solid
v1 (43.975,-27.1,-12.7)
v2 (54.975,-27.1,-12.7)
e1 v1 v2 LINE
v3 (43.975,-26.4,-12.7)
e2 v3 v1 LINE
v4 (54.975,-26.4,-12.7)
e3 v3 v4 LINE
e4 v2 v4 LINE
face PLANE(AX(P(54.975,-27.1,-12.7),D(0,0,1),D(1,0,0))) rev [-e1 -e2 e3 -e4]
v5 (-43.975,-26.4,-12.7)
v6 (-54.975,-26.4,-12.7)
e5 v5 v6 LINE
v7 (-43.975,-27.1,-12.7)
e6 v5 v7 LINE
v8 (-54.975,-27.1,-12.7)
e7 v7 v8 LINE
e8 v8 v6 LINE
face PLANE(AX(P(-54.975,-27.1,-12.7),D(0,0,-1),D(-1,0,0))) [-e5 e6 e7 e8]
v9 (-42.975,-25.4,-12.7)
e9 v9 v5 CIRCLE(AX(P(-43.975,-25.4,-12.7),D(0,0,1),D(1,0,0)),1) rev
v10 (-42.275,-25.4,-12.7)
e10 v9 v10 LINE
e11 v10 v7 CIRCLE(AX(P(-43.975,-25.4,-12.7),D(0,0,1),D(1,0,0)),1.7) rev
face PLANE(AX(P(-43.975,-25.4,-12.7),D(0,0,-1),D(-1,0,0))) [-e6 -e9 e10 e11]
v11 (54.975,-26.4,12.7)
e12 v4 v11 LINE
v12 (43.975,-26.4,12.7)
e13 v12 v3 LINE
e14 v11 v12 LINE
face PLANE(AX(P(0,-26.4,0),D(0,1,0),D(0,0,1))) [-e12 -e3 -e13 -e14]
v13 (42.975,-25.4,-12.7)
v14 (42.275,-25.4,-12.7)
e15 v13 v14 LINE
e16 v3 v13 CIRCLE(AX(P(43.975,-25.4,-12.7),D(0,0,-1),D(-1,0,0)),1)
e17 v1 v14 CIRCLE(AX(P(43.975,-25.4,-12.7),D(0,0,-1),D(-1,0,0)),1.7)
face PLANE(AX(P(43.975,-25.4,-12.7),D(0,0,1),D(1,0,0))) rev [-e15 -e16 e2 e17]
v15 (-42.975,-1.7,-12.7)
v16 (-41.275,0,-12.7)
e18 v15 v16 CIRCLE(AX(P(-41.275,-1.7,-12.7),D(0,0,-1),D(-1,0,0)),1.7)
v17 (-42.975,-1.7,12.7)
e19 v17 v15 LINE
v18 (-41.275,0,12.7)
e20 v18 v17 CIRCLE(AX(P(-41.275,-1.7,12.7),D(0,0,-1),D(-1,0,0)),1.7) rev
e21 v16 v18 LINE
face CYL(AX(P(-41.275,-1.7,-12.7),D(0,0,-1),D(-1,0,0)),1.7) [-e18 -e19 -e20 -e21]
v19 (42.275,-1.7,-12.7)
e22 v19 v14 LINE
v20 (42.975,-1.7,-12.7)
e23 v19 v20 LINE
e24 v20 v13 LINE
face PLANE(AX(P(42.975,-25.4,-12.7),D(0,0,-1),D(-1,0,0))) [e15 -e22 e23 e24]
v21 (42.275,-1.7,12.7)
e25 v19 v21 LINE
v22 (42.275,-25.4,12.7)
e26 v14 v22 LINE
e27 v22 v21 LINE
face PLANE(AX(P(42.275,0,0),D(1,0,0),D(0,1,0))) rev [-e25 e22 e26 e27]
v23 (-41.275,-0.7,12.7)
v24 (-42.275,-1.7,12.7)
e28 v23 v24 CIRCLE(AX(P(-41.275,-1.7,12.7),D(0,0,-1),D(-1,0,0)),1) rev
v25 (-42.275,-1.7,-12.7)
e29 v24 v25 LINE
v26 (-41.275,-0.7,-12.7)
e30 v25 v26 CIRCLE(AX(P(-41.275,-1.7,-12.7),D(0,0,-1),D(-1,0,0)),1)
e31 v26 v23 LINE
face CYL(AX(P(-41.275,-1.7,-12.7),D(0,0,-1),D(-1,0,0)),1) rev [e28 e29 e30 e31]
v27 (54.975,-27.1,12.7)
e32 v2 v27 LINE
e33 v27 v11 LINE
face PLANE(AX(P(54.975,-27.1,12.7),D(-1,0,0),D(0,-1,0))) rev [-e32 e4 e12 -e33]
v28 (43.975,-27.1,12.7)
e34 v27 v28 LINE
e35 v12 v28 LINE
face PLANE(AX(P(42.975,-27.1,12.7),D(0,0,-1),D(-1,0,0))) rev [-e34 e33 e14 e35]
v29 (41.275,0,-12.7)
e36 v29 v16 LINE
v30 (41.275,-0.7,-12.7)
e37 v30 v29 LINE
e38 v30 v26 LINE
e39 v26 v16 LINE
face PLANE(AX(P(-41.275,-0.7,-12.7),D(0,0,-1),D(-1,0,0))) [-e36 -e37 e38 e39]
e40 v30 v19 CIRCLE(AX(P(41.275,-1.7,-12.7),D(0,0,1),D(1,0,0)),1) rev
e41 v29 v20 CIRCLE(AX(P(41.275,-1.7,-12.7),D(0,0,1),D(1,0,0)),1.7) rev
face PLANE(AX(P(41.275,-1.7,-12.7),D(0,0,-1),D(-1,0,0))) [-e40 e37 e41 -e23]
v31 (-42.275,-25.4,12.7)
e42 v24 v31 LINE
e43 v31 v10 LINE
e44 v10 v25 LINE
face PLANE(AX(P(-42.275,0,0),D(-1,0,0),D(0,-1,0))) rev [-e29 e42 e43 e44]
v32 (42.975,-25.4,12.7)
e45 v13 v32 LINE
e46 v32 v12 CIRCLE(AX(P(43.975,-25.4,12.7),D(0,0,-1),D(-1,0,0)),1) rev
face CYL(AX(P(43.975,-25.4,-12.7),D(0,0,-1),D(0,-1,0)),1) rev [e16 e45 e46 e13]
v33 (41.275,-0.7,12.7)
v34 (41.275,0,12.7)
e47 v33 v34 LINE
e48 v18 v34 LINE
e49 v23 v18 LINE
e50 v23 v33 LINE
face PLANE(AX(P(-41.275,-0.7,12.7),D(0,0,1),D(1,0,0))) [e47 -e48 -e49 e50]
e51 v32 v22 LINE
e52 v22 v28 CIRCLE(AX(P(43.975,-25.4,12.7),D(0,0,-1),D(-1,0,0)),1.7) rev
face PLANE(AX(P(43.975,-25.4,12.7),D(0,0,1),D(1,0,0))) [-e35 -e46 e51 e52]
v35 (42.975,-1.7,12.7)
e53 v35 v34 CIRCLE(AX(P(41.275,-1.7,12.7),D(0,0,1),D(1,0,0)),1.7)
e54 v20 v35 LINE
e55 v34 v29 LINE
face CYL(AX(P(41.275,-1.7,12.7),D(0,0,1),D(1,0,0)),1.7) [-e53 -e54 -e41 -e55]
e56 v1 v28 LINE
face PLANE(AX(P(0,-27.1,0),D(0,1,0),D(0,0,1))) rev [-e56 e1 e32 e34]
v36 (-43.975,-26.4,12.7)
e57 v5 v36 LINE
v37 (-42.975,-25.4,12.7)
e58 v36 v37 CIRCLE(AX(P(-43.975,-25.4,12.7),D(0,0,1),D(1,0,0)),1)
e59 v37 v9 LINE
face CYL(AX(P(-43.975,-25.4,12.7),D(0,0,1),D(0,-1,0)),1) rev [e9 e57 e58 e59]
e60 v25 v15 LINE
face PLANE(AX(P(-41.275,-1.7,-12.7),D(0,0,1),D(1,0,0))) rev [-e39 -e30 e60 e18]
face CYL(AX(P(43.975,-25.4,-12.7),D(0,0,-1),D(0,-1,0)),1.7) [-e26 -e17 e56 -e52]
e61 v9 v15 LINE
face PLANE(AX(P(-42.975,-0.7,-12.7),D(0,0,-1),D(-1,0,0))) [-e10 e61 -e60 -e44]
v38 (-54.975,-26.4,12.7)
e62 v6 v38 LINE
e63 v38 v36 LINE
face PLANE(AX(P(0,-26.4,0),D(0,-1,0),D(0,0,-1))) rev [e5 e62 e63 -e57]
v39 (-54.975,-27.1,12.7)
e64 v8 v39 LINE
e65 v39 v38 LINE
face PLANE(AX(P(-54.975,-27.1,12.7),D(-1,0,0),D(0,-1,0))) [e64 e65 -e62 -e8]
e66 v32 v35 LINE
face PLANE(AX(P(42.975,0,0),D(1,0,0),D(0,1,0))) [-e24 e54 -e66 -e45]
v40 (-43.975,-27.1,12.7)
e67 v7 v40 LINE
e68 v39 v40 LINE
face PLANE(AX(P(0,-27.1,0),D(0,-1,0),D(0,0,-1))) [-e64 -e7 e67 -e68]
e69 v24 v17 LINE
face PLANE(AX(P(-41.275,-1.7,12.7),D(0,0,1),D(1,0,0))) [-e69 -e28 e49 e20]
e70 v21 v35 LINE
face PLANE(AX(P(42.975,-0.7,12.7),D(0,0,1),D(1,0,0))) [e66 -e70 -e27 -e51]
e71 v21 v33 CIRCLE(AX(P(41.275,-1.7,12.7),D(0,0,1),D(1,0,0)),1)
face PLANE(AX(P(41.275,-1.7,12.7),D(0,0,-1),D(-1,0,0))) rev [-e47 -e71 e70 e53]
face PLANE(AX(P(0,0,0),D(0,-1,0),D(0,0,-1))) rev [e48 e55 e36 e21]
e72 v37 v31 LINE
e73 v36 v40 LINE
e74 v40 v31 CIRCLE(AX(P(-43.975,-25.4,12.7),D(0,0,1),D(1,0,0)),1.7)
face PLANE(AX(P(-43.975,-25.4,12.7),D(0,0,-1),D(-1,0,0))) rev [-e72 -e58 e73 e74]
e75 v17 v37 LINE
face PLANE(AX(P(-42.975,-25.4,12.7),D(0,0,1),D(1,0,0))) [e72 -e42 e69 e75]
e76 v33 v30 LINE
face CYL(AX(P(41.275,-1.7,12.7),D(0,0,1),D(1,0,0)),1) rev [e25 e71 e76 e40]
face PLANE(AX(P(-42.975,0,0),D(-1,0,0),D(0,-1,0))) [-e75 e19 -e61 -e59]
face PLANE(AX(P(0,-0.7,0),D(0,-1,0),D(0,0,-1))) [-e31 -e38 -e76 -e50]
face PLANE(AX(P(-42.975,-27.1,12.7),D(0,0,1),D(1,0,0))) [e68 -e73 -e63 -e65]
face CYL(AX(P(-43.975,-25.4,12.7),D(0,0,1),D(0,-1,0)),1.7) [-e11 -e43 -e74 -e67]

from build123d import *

# Parameters (mm, degrees)
SKETCH1_W          = 82.55
SKETCH1_H          = 25.4
BASE_FLANGE1_DEPTH = 0.7
EDGE_FLANGE1_DEPTH = 25.4
EDGE_FLANGE2_DEPTH = 25.4
EDGE_FLANGE3_DEPTH = 25.4
EDGE_FLANGE4_DEPTH = 25.4


# Sheet-metal steps are written as plain solids
with BuildPart() as part:
    # Sketch1 → Base-Flange1 (new body)
    with BuildSketch(Plane(origin=(0, 0, 0), x_dir=(1, 0, 0), z_dir=(0, 1, 0))):
        Rectangle(SKETCH1_W, SKETCH1_H)
    extrude(amount=-BASE_FLANGE1_DEPTH)

    # Edge-Flange1 section (across the edge) → Edge-Flange1 (add)
    with BuildSketch(Plane(origin=(42.275, -0.7, -12.7), x_dir=(-1, 0, 0), z_dir=(0, 0, 1))):
        with BuildLine():
            Line((-0.7, 1), (-0.7, 24.7))
            Line((-0.7, 24.7), (0, 24.7))
            Line((0, 24.7), (0, 1))
            ThreePointArc((0, 1), (0.292893219, 0.292893219), (1, 0))
            Line((1, 0), (1, -0.7))
            ThreePointArc((1, -0.7), (-0.202081528, -0.202081528), (-0.7, 1))
        make_face()
    extrude(amount=EDGE_FLANGE1_DEPTH)

    # Edge-Flange2 section (across the edge) → Edge-Flange2 (add)
    with BuildSketch(Plane(origin=(42.975, -26.4, 12.7), x_dir=(0, 1, 0), z_dir=(0, 0, -1))):
        with BuildLine():
            Line((-0.7, 1), (-0.7, 12))
            Line((-0.7, 12), (0, 12))
            Line((0, 12), (0, 1))
            ThreePointArc((0, 1), (0.292893219, 0.292893219), (1, 0))
            Line((1, 0), (1, -0.7))
            ThreePointArc((1, -0.7), (-0.202081528, -0.202081528), (-0.7, 1))
        make_face()
    extrude(amount=EDGE_FLANGE2_DEPTH)

    # Edge-Flange3 section (across the edge) → Edge-Flange3 (add)
    with BuildSketch(Plane(origin=(-42.275, -0.7, 12.7), x_dir=(1, 0, 0), z_dir=(0, 0, -1))):
        with BuildLine():
            Line((-0.7, 1), (-0.7, 24.7))
            Line((-0.7, 24.7), (0, 24.7))
            Line((0, 24.7), (0, 1))
            ThreePointArc((0, 1), (0.292893219, 0.292893219), (1, 0))
            Line((1, 0), (1, -0.7))
            ThreePointArc((1, -0.7), (-0.202081528, -0.202081528), (-0.7, 1))
        make_face()
    extrude(amount=EDGE_FLANGE3_DEPTH)

    # Edge-Flange4 section (across the edge) → Edge-Flange4 (add)
    with BuildSketch(Plane(origin=(-42.975, -26.4, -12.7), x_dir=(0, 1, 0), z_dir=(0, 0, 1))):
        with BuildLine():
            Line((-0.7, 1), (-0.7, 12))
            Line((-0.7, 12), (0, 12))
            Line((0, 12), (0, 1))
            ThreePointArc((0, 1), (0.292893219, 0.292893219), (1, 0))
            Line((1, 0), (1, -0.7))
            ThreePointArc((1, -0.7), (-0.202081528, -0.202081528), (-0.7, 1))
        make_face()
    extrude(amount=EDGE_FLANGE4_DEPTH)


solid = part.part
